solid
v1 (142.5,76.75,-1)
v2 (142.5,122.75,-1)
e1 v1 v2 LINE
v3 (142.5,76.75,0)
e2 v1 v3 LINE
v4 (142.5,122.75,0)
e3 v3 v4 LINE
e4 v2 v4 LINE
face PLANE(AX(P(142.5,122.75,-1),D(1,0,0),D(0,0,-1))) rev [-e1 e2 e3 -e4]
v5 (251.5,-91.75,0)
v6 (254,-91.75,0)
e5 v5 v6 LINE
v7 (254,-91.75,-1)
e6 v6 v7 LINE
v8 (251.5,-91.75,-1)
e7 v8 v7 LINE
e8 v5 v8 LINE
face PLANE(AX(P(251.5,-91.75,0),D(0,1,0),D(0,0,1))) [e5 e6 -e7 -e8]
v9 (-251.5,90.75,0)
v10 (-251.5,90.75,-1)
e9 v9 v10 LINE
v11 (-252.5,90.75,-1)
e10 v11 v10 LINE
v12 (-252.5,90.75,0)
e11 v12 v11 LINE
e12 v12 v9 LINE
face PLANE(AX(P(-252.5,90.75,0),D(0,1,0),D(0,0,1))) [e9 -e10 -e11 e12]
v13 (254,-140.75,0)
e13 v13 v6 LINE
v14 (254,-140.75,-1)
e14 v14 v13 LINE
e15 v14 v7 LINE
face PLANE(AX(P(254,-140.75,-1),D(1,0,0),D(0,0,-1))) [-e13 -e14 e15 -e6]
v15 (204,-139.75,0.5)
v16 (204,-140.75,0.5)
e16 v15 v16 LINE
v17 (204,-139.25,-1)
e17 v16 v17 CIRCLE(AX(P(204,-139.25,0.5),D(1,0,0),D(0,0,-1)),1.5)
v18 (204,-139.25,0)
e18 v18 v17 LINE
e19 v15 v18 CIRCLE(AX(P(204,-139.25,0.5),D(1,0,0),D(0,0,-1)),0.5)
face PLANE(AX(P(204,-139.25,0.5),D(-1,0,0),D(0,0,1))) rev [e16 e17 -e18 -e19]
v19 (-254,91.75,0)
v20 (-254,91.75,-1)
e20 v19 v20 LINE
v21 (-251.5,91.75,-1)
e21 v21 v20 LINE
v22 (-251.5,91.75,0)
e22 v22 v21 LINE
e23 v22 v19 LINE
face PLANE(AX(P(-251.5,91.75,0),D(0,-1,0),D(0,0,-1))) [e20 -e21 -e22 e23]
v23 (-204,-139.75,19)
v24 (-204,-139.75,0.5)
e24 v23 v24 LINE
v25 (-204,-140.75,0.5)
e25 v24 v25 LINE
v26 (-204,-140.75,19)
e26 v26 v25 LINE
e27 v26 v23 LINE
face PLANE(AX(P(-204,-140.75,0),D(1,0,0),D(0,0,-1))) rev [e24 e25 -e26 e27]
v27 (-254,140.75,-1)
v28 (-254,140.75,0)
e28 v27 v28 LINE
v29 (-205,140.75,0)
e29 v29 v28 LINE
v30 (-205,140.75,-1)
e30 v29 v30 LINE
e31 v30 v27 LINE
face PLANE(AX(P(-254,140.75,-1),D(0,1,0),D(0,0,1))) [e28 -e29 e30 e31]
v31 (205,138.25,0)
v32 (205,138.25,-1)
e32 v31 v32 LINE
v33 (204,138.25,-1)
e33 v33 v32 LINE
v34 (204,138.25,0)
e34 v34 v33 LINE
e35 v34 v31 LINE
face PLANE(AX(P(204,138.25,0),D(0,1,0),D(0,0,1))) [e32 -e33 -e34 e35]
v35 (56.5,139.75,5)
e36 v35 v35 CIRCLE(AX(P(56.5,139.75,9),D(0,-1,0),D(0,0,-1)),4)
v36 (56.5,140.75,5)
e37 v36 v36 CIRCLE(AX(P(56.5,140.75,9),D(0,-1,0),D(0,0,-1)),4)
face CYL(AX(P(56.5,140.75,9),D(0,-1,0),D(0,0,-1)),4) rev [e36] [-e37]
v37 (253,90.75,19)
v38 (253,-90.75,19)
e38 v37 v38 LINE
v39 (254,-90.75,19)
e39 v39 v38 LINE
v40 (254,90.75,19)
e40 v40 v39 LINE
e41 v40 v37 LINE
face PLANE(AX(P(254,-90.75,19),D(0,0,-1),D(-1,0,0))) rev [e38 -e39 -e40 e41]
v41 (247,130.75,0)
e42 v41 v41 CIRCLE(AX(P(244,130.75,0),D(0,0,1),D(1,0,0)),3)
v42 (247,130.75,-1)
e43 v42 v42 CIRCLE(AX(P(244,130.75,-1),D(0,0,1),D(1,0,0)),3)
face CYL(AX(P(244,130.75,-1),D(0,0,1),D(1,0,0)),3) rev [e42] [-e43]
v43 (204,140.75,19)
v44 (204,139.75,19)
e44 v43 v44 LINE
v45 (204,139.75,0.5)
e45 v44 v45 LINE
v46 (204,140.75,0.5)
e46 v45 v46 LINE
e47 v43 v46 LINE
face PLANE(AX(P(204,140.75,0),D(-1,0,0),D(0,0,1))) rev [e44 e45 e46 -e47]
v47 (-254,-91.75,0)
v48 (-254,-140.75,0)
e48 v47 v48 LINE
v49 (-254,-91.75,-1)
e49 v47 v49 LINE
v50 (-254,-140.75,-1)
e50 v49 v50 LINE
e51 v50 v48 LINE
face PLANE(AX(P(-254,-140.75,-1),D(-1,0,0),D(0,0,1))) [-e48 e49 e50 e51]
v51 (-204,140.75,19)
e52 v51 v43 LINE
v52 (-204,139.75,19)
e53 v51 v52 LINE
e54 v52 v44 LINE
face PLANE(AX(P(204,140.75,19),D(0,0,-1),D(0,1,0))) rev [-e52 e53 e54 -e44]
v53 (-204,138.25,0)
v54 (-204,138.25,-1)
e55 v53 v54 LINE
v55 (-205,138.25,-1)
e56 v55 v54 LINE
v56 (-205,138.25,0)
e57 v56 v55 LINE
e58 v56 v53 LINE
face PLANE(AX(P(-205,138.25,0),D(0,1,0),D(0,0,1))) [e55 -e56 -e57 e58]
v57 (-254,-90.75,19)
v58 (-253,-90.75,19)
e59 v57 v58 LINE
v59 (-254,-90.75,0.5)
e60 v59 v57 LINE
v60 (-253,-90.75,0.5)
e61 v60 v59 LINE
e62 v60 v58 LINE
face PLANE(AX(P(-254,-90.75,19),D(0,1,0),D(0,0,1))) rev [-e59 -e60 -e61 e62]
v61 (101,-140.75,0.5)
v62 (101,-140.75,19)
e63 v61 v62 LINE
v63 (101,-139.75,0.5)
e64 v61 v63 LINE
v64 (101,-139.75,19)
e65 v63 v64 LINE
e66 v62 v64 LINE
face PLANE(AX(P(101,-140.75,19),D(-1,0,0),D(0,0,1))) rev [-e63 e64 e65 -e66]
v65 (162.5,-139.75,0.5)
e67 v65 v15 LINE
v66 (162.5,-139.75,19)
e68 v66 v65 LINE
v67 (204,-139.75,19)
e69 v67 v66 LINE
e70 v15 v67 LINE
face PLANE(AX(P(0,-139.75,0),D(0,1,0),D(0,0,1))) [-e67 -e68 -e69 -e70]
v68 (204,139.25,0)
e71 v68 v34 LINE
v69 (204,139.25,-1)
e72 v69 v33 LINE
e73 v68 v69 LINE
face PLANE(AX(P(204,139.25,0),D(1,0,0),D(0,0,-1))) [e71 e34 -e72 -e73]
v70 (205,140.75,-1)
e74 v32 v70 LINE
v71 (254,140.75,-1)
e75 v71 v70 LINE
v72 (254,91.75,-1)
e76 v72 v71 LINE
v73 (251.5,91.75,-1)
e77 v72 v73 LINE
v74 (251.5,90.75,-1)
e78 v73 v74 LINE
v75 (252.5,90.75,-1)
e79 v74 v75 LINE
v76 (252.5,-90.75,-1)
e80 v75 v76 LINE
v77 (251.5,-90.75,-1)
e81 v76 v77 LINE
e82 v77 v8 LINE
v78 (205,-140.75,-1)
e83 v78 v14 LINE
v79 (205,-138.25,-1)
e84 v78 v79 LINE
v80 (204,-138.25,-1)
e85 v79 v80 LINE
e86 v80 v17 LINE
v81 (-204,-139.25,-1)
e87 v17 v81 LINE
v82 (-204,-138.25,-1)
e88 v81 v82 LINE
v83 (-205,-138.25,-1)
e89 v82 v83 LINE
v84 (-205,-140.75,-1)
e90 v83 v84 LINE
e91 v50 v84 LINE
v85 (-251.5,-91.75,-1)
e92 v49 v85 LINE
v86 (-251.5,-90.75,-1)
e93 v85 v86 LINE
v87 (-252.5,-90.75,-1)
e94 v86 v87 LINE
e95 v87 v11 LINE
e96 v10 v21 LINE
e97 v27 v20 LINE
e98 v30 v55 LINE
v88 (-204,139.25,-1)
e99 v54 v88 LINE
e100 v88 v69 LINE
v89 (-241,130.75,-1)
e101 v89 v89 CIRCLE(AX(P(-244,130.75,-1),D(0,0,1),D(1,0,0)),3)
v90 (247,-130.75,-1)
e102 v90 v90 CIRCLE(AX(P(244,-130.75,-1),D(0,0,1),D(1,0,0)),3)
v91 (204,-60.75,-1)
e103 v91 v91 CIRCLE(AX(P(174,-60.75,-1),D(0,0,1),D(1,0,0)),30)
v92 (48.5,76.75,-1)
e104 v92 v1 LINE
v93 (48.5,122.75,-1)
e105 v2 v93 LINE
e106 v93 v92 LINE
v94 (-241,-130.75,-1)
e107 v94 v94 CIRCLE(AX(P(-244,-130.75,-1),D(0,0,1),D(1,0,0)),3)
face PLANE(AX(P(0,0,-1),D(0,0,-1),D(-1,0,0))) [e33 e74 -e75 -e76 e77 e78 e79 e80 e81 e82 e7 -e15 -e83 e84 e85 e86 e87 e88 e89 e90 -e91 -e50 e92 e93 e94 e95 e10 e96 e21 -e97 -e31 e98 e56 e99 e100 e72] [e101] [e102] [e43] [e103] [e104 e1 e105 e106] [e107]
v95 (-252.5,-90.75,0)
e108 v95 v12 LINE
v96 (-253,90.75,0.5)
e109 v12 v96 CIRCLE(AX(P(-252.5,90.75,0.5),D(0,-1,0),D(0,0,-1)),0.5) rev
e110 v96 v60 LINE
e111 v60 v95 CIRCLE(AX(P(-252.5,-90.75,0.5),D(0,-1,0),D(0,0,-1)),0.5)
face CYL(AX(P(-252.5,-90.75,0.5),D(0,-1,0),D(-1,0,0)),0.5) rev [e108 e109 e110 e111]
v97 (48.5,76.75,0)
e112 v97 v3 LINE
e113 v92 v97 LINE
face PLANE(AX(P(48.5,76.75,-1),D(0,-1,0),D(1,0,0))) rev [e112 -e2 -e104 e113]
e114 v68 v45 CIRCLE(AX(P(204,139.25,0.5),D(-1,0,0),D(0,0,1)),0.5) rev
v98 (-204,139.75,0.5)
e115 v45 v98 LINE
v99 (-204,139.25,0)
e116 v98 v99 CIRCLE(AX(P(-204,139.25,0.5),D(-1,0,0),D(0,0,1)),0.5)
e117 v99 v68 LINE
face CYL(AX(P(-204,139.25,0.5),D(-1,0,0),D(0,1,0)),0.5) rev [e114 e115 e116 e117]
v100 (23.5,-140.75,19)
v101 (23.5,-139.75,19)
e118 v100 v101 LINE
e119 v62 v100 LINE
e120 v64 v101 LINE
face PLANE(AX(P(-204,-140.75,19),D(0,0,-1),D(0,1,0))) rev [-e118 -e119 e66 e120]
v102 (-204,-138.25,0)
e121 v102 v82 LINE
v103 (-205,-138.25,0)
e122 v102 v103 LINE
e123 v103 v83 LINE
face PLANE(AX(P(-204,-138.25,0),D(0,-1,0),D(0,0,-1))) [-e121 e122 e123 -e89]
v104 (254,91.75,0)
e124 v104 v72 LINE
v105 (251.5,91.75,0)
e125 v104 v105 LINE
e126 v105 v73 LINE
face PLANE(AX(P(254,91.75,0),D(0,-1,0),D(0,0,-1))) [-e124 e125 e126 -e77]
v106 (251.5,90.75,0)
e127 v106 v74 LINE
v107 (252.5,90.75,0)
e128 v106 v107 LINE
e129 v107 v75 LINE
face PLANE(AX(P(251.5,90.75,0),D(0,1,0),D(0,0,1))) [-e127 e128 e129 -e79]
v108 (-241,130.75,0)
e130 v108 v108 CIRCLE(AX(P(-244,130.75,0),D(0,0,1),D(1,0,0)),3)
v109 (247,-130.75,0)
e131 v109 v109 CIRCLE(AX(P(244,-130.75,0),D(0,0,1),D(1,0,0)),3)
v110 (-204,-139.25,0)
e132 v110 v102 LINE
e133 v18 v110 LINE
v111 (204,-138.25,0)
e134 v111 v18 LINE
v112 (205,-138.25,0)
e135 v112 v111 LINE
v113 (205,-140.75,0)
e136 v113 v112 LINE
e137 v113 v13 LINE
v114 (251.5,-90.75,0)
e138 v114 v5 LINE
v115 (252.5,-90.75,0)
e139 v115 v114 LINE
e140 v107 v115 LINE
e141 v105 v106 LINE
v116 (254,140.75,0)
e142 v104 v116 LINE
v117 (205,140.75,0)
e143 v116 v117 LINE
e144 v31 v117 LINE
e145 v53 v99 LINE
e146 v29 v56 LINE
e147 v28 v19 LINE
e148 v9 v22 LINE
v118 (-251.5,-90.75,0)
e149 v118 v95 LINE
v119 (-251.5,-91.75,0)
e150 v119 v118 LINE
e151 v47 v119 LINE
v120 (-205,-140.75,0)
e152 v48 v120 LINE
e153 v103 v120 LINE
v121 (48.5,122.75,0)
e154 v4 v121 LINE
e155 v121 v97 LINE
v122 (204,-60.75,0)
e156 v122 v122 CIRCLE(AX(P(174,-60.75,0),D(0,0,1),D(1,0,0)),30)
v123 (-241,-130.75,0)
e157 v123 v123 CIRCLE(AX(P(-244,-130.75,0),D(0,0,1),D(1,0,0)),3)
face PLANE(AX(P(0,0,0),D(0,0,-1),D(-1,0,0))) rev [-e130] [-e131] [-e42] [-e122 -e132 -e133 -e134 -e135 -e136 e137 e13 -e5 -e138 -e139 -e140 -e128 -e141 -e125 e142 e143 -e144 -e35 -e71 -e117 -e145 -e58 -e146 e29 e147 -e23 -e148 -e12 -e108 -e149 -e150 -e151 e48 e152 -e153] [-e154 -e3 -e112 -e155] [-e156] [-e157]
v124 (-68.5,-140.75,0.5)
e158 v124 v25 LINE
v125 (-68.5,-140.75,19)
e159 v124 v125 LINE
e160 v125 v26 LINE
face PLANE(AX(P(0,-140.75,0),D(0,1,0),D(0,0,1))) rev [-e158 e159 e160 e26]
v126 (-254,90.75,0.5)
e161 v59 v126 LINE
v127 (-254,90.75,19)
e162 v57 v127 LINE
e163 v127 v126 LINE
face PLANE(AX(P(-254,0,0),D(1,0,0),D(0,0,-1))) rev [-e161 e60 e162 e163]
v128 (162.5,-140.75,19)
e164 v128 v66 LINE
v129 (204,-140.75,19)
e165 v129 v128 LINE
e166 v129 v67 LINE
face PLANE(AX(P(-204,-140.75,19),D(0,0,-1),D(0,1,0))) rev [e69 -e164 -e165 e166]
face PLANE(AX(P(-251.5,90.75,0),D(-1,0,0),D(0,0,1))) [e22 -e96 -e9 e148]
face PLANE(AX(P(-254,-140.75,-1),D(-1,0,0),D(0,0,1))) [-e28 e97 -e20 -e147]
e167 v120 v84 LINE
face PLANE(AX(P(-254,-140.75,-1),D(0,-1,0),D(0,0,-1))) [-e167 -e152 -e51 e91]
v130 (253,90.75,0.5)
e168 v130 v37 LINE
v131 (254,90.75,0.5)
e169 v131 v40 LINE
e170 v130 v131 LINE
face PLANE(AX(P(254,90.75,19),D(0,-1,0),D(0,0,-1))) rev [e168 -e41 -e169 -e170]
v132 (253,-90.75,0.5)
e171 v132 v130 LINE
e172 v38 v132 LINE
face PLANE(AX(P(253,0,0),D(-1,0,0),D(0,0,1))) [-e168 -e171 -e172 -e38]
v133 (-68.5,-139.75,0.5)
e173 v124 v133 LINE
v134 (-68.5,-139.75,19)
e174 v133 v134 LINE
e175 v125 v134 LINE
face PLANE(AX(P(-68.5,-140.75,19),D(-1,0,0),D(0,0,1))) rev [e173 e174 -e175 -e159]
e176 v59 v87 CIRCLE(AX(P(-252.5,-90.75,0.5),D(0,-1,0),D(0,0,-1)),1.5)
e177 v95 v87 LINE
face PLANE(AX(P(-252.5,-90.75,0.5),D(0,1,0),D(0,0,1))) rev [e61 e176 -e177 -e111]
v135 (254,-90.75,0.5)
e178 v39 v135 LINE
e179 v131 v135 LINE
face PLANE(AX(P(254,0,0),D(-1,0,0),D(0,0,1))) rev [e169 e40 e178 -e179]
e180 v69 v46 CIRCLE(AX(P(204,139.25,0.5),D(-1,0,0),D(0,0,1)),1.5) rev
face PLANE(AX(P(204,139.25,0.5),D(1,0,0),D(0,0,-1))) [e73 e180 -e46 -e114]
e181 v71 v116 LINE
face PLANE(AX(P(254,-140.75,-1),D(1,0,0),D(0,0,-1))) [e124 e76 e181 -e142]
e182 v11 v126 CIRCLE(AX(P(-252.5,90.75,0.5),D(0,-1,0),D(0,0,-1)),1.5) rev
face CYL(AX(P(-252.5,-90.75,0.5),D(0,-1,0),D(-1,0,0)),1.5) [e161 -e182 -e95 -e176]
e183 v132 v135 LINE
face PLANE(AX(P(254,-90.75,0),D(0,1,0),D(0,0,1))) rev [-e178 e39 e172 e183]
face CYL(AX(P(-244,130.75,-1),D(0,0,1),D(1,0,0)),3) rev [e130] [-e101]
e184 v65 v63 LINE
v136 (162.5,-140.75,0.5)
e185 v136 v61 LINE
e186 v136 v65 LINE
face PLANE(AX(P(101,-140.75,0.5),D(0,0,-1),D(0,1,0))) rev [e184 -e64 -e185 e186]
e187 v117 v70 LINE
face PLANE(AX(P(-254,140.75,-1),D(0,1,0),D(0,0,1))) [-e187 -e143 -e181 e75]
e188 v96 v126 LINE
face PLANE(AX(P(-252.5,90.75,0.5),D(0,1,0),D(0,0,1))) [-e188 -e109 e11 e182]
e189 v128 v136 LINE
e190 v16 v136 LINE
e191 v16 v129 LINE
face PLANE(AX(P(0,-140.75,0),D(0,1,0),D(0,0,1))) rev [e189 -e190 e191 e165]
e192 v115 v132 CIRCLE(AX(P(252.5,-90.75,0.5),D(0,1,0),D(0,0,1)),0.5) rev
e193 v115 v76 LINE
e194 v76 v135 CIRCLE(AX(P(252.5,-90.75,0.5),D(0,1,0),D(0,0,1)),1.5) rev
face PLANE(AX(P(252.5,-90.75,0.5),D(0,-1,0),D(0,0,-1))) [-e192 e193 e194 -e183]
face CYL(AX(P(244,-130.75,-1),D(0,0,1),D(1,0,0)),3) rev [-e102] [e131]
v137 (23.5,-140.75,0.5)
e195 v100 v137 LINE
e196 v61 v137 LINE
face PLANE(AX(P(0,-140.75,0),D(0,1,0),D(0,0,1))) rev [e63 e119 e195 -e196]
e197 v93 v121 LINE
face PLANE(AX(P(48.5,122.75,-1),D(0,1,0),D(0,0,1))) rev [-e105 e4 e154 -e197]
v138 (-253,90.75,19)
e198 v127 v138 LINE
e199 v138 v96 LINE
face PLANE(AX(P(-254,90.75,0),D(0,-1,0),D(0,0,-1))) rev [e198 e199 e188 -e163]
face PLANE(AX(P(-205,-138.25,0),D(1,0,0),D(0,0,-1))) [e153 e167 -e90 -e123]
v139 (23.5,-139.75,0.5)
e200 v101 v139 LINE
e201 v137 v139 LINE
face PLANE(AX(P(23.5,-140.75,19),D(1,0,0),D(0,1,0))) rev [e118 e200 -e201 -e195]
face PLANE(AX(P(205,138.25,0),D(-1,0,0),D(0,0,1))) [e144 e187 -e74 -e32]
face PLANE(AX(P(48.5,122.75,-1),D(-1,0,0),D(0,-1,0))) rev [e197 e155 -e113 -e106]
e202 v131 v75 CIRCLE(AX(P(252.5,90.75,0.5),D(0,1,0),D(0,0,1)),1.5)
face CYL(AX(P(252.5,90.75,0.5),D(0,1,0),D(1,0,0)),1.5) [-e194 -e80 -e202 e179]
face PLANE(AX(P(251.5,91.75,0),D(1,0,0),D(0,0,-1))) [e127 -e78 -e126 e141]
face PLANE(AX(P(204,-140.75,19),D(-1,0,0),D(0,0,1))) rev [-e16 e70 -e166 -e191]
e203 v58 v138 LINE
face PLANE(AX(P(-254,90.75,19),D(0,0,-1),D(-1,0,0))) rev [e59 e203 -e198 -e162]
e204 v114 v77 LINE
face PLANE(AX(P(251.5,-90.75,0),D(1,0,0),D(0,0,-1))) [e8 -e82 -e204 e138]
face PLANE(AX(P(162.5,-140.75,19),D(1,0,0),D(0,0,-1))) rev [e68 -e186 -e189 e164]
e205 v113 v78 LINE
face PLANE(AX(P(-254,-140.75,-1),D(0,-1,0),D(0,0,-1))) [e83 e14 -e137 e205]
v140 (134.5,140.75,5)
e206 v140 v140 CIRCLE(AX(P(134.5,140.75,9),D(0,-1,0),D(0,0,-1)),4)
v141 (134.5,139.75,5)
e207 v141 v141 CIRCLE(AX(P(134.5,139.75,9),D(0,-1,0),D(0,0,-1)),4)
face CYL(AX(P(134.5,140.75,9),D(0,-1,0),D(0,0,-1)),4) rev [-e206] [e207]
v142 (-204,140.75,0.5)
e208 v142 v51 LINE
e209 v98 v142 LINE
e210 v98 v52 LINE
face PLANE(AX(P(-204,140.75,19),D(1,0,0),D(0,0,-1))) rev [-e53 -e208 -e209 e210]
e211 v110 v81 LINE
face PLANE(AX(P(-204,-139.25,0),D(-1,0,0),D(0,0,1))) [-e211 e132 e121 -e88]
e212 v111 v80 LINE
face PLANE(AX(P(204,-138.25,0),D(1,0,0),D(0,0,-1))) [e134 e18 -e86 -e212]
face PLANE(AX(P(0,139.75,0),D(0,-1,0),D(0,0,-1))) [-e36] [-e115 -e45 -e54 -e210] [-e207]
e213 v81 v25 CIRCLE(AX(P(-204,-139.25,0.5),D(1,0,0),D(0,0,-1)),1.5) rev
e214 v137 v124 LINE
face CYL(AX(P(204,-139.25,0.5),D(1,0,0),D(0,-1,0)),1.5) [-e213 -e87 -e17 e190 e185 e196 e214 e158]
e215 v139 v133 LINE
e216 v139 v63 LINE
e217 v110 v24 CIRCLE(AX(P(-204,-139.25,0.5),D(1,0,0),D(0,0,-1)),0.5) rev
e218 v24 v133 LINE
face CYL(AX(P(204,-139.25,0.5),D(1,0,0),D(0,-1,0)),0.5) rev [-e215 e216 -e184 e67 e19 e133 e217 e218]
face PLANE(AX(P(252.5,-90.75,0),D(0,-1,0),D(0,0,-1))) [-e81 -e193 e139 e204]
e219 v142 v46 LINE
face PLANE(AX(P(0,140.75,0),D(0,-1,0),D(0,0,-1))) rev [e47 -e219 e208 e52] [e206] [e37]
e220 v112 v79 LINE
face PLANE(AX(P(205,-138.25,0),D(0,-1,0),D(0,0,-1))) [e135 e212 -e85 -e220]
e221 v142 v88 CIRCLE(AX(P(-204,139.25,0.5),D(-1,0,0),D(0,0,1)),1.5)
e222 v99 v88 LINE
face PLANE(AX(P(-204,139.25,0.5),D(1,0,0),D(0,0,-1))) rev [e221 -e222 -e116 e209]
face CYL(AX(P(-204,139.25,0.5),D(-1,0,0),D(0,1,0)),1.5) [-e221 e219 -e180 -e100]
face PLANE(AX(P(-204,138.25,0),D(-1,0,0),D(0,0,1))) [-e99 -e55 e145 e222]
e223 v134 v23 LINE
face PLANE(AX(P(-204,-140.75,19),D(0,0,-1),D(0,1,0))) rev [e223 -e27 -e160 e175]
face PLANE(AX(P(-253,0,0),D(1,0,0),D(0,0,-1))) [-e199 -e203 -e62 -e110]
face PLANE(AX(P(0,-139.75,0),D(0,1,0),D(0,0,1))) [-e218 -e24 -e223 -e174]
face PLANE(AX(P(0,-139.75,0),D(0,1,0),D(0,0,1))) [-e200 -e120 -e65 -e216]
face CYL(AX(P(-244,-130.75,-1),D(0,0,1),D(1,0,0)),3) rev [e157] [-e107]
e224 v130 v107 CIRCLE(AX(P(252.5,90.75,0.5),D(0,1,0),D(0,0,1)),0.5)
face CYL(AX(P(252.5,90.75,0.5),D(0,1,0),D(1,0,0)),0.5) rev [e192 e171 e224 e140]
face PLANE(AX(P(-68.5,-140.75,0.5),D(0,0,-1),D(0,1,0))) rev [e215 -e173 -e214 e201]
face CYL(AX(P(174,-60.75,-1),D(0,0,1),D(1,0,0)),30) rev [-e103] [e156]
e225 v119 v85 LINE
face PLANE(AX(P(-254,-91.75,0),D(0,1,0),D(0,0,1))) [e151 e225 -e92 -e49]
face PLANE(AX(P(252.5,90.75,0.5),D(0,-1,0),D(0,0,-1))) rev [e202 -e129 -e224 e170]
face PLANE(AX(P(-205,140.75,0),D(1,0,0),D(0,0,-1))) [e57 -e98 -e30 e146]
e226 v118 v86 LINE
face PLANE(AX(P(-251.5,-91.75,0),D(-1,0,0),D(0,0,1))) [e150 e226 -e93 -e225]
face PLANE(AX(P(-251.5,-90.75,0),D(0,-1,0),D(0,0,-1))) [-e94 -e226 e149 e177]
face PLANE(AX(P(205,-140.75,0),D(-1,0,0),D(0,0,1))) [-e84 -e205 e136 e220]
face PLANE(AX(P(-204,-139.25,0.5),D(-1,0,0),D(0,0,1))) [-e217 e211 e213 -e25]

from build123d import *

# Parameters (mm, degrees)
SKETCH_1_W                        = 508
SKETCH_1_H                        = 281.5
SKETCH_1_R                        = 3
SKETCH_1_R_2                      = 30
SKETCH_1_W_2                      = 94
SKETCH_1_H_2                      = 46
SM_BASE_FLANGE_1_DEPTH            = 1
SM_EDGE_FLANGE_1_STRIP_W          = 5
SM_EDGE_FLANGE_1_STRIP_H          = 1
SM_EDGE_FLANGE_1_STRIP_CUT_DEPTH  = 408
SM_EDGE_FLANGE_1_RELIEF_W         = 6
SM_EDGE_FLANGE_1_RELIEF_H         = 1
SM_EDGE_FLANGE_1_RELIEF_CUT_DEPTH = 1
SM_EDGE_FLANGE_1_DEPTH            = 408
SM_EDGE_FLANGE_2_STRIP_W          = 5
SM_EDGE_FLANGE_2_STRIP_H          = 1
SM_EDGE_FLANGE_2_STRIP_CUT_DEPTH  = 408
SM_EDGE_FLANGE_2_RELIEF_W         = 6
SM_EDGE_FLANGE_2_RELIEF_H         = 1
SM_EDGE_FLANGE_2_RELIEF_CUT_DEPTH = 1
SM_EDGE_FLANGE_2_DEPTH            = 408
SM_EDGE_FLANGE_3_STRIP_W          = 5
SM_EDGE_FLANGE_3_STRIP_H          = 1
SM_EDGE_FLANGE_3_STRIP_CUT_DEPTH  = 181.5
SM_EDGE_FLANGE_3_RELIEF_W         = 6
SM_EDGE_FLANGE_3_RELIEF_H         = 1
SM_EDGE_FLANGE_3_RELIEF_CUT_DEPTH = 1
SM_EDGE_FLANGE_3_DEPTH            = 181.5
SM_EDGE_FLANGE_4_STRIP_W          = 5
SM_EDGE_FLANGE_4_STRIP_H          = 1
SM_EDGE_FLANGE_4_STRIP_CUT_DEPTH  = 181.5
SM_EDGE_FLANGE_4_RELIEF_W         = 6
SM_EDGE_FLANGE_4_RELIEF_H         = 1
SM_EDGE_FLANGE_4_RELIEF_CUT_DEPTH = 1
SM_EDGE_FLANGE_4_DEPTH            = 181.5
SKETCH_18_R                       = 4
CUT_EXTRUDE_1_DEPTH               = 379.889495764
SKETCH_19_W                       = 92
SKETCH_19_H                       = 18.5
SKETCH_19_W_2                     = 61.5
CUT_EXTRUDE_2_DEPTH               = 379.889495764


# Sheet-metal steps are written as plain solids
with BuildPart() as part:
    # Sketch 1 → 基体-法兰1 (new body)
    with BuildSketch(Plane.XY):
        Rectangle(SKETCH_1_W, SKETCH_1_H)
        with Locations((-244, 130.75)):
            Circle(SKETCH_1_R, mode=Mode.SUBTRACT)
        with Locations((-244, -130.75)):
            Circle(SKETCH_1_R, mode=Mode.SUBTRACT)
        with Locations((244, 130.75)):
            Circle(SKETCH_1_R, mode=Mode.SUBTRACT)
        with Locations((244, -130.75)):
            Circle(SKETCH_1_R, mode=Mode.SUBTRACT)
        with Locations((174, -60.75)):
            Circle(SKETCH_1_R_2, mode=Mode.SUBTRACT)
        with Locations((95.5, 99.75)):
            Rectangle(SKETCH_1_W_2, SKETCH_1_H_2, mode=Mode.SUBTRACT)
    extrude(amount=-SM_BASE_FLANGE_1_DEPTH)

    # 边线-法兰1 strip (across the edge) → 边线-法兰1 strip cut (cut)
    with BuildSketch(Plane(origin=(204, 140.75, 0), x_dir=(0, -1, 0), z_dir=(-1, 0, 0))):
        with Locations((-1, -0.5)):
            Rectangle(SM_EDGE_FLANGE_1_STRIP_W, SM_EDGE_FLANGE_1_STRIP_H)
    extrude(amount=SM_EDGE_FLANGE_1_STRIP_CUT_DEPTH, mode=Mode.SUBTRACT)

    # 边线-法兰1 relief (on the sheet) → 边线-法兰1 relief cut (cut)
    with BuildSketch(Plane(origin=(204, 139.25, 0), x_dir=(0, -1, 0), z_dir=(0, 0, 1))):
        with Locations((-2, 0.5)):
            Rectangle(SM_EDGE_FLANGE_1_RELIEF_W, SM_EDGE_FLANGE_1_RELIEF_H)
        with Locations((-2, -408.5)):
            Rectangle(SM_EDGE_FLANGE_1_RELIEF_W, SM_EDGE_FLANGE_1_RELIEF_H)
    extrude(amount=-SM_EDGE_FLANGE_1_RELIEF_CUT_DEPTH, mode=Mode.SUBTRACT)

    # 边线-法兰1 section (across the edge) → 边线-法兰1 (add)
    with BuildSketch(Plane(origin=(204, 140.75, 0), x_dir=(0, -1, 0), z_dir=(-1, 0, 0))):
        with BuildLine():
            Line((0, 0.5), (0, 19))
            Line((0, 19), (1, 19))
            Line((1, 19), (1, 0.5))
            ThreePointArc((1, 0.5), (1.146446609, 0.146446609), (1.5, 0))
            Line((1.5, 0), (1.5, -1))
            ThreePointArc((1.5, -1), (0.439339828, -0.560660172), (0, 0.5))
        make_face()
    extrude(amount=SM_EDGE_FLANGE_1_DEPTH)

    # 边线-法兰2 strip (across the edge) → 边线-法兰2 strip cut (cut)
    with BuildSketch(Plane(origin=(-204, -140.75, 0), x_dir=(0, 1, 0), z_dir=(1, 0, 0))):
        with Locations((-1, -0.5)):
            Rectangle(SM_EDGE_FLANGE_2_STRIP_W, SM_EDGE_FLANGE_2_STRIP_H)
    extrude(amount=SM_EDGE_FLANGE_2_STRIP_CUT_DEPTH, mode=Mode.SUBTRACT)

    # 边线-法兰2 relief (on the sheet) → 边线-法兰2 relief cut (cut)
    with BuildSketch(Plane(origin=(-204, -139.25, 0), x_dir=(0, 1, 0), z_dir=(0, 0, 1))):
        with Locations((-2, 0.5)):
            Rectangle(SM_EDGE_FLANGE_2_RELIEF_W, SM_EDGE_FLANGE_2_RELIEF_H)
        with Locations((-2, -408.5)):
            Rectangle(SM_EDGE_FLANGE_2_RELIEF_W, SM_EDGE_FLANGE_2_RELIEF_H)
    extrude(amount=-SM_EDGE_FLANGE_2_RELIEF_CUT_DEPTH, mode=Mode.SUBTRACT)

    # 边线-法兰2 section (across the edge) → 边线-法兰2 (add)
    with BuildSketch(Plane(origin=(-204, -140.75, 0), x_dir=(0, 1, 0), z_dir=(1, 0, 0))):
        with BuildLine():
            Line((0, 0.5), (0, 19))
            Line((0, 19), (1, 19))
            Line((1, 19), (1, 0.5))
            ThreePointArc((1, 0.5), (1.146446609, 0.146446609), (1.5, 0))
            Line((1.5, 0), (1.5, -1))
            ThreePointArc((1.5, -1), (0.439339828, -0.560660172), (0, 0.5))
        make_face()
    extrude(amount=SM_EDGE_FLANGE_2_DEPTH)

    # 边线-法兰3 strip (across the edge) → 边线-法兰3 strip cut (cut)
    with BuildSketch(Plane(origin=(254, -90.75, 0), x_dir=(-1, 0, 0), z_dir=(0, 1, 0))):
        with Locations((-1, -0.5)):
            Rectangle(SM_EDGE_FLANGE_3_STRIP_W, SM_EDGE_FLANGE_3_STRIP_H)
    extrude(amount=SM_EDGE_FLANGE_3_STRIP_CUT_DEPTH, mode=Mode.SUBTRACT)

    # 边线-法兰3 relief (on the sheet) → 边线-法兰3 relief cut (cut)
    with BuildSketch(Plane(origin=(252.5, -90.75, 0), x_dir=(-1, 0, 0), z_dir=(0, 0, 1))):
        with Locations((-2, 0.5)):
            Rectangle(SM_EDGE_FLANGE_3_RELIEF_W, SM_EDGE_FLANGE_3_RELIEF_H)
        with Locations((-2, -182)):
            Rectangle(SM_EDGE_FLANGE_3_RELIEF_W, SM_EDGE_FLANGE_3_RELIEF_H)
    extrude(amount=-SM_EDGE_FLANGE_3_RELIEF_CUT_DEPTH, mode=Mode.SUBTRACT)

    # 边线-法兰3 section (across the edge) → 边线-法兰3 (add)
    with BuildSketch(Plane(origin=(254, -90.75, 0), x_dir=(-1, 0, 0), z_dir=(0, 1, 0))):
        with BuildLine():
            Line((0, 0.5), (0, 19))
            Line((0, 19), (1, 19))
            Line((1, 19), (1, 0.5))
            ThreePointArc((1, 0.5), (1.146446609, 0.146446609), (1.5, 0))
            Line((1.5, 0), (1.5, -1))
            ThreePointArc((1.5, -1), (0.439339828, -0.560660172), (0, 0.5))
        make_face()
    extrude(amount=SM_EDGE_FLANGE_3_DEPTH)

    # 边线-法兰4 strip (across the edge) → 边线-法兰4 strip cut (cut)
    with BuildSketch(Plane(origin=(-254, 90.75, 0), x_dir=(1, 0, 0), z_dir=(0, -1, 0))):
        with Locations((-1, -0.5)):
            Rectangle(SM_EDGE_FLANGE_4_STRIP_W, SM_EDGE_FLANGE_4_STRIP_H)
    extrude(amount=SM_EDGE_FLANGE_4_STRIP_CUT_DEPTH, mode=Mode.SUBTRACT)

    # 边线-法兰4 relief (on the sheet) → 边线-法兰4 relief cut (cut)
    with BuildSketch(Plane(origin=(-252.5, 90.75, 0), x_dir=(1, 0, 0), z_dir=(0, 0, 1))):
        with Locations((-2, 0.5)):
            Rectangle(SM_EDGE_FLANGE_4_RELIEF_W, SM_EDGE_FLANGE_4_RELIEF_H)
        with Locations((-2, -182)):
            Rectangle(SM_EDGE_FLANGE_4_RELIEF_W, SM_EDGE_FLANGE_4_RELIEF_H)
    extrude(amount=-SM_EDGE_FLANGE_4_RELIEF_CUT_DEPTH, mode=Mode.SUBTRACT)

    # 边线-法兰4 section (across the edge) → 边线-法兰4 (add)
    with BuildSketch(Plane(origin=(-254, 90.75, 0), x_dir=(1, 0, 0), z_dir=(0, -1, 0))):
        with BuildLine():
            Line((0, 0.5), (0, 19))
            Line((0, 19), (1, 19))
            Line((1, 19), (1, 0.5))
            ThreePointArc((1, 0.5), (1.146446609, 0.146446609), (1.5, 0))
            Line((1.5, 0), (1.5, -1))
            ThreePointArc((1.5, -1), (0.439339828, -0.560660172), (0, 0.5))
        make_face()
    extrude(amount=SM_EDGE_FLANGE_4_DEPTH)

    # 草图18 → 切除-拉伸1 (cut, through all)
    with BuildSketch(Plane(origin=(0, 139.75, 0), x_dir=(-1, 0, 0), z_dir=(0, -1, 0))):
        with Locations(Location((-134.5, -9, 0), (0, 0, 90))):
            Circle(SKETCH_18_R)
        with Locations(Location((-56.5, -9, 0), (0, 0, 90))):
            Circle(SKETCH_18_R)
    extrude(amount=-CUT_EXTRUDE_1_DEPTH, mode=Mode.SUBTRACT)

    # 草图19 → 切除-拉伸2 (cut, through all)
    with BuildSketch(Plane(origin=(0, -139.75, 0), x_dir=(1, 0, 0), z_dir=(0, 1, 0))):
        with Locations((-22.5, -9.75)):
            Rectangle(SKETCH_19_W, SKETCH_19_H)
        with Locations((131.75, -9.75)):
            Rectangle(SKETCH_19_W_2, SKETCH_19_H)
    extrude(amount=-CUT_EXTRUDE_2_DEPTH, mode=Mode.SUBTRACT)


solid = part.part
